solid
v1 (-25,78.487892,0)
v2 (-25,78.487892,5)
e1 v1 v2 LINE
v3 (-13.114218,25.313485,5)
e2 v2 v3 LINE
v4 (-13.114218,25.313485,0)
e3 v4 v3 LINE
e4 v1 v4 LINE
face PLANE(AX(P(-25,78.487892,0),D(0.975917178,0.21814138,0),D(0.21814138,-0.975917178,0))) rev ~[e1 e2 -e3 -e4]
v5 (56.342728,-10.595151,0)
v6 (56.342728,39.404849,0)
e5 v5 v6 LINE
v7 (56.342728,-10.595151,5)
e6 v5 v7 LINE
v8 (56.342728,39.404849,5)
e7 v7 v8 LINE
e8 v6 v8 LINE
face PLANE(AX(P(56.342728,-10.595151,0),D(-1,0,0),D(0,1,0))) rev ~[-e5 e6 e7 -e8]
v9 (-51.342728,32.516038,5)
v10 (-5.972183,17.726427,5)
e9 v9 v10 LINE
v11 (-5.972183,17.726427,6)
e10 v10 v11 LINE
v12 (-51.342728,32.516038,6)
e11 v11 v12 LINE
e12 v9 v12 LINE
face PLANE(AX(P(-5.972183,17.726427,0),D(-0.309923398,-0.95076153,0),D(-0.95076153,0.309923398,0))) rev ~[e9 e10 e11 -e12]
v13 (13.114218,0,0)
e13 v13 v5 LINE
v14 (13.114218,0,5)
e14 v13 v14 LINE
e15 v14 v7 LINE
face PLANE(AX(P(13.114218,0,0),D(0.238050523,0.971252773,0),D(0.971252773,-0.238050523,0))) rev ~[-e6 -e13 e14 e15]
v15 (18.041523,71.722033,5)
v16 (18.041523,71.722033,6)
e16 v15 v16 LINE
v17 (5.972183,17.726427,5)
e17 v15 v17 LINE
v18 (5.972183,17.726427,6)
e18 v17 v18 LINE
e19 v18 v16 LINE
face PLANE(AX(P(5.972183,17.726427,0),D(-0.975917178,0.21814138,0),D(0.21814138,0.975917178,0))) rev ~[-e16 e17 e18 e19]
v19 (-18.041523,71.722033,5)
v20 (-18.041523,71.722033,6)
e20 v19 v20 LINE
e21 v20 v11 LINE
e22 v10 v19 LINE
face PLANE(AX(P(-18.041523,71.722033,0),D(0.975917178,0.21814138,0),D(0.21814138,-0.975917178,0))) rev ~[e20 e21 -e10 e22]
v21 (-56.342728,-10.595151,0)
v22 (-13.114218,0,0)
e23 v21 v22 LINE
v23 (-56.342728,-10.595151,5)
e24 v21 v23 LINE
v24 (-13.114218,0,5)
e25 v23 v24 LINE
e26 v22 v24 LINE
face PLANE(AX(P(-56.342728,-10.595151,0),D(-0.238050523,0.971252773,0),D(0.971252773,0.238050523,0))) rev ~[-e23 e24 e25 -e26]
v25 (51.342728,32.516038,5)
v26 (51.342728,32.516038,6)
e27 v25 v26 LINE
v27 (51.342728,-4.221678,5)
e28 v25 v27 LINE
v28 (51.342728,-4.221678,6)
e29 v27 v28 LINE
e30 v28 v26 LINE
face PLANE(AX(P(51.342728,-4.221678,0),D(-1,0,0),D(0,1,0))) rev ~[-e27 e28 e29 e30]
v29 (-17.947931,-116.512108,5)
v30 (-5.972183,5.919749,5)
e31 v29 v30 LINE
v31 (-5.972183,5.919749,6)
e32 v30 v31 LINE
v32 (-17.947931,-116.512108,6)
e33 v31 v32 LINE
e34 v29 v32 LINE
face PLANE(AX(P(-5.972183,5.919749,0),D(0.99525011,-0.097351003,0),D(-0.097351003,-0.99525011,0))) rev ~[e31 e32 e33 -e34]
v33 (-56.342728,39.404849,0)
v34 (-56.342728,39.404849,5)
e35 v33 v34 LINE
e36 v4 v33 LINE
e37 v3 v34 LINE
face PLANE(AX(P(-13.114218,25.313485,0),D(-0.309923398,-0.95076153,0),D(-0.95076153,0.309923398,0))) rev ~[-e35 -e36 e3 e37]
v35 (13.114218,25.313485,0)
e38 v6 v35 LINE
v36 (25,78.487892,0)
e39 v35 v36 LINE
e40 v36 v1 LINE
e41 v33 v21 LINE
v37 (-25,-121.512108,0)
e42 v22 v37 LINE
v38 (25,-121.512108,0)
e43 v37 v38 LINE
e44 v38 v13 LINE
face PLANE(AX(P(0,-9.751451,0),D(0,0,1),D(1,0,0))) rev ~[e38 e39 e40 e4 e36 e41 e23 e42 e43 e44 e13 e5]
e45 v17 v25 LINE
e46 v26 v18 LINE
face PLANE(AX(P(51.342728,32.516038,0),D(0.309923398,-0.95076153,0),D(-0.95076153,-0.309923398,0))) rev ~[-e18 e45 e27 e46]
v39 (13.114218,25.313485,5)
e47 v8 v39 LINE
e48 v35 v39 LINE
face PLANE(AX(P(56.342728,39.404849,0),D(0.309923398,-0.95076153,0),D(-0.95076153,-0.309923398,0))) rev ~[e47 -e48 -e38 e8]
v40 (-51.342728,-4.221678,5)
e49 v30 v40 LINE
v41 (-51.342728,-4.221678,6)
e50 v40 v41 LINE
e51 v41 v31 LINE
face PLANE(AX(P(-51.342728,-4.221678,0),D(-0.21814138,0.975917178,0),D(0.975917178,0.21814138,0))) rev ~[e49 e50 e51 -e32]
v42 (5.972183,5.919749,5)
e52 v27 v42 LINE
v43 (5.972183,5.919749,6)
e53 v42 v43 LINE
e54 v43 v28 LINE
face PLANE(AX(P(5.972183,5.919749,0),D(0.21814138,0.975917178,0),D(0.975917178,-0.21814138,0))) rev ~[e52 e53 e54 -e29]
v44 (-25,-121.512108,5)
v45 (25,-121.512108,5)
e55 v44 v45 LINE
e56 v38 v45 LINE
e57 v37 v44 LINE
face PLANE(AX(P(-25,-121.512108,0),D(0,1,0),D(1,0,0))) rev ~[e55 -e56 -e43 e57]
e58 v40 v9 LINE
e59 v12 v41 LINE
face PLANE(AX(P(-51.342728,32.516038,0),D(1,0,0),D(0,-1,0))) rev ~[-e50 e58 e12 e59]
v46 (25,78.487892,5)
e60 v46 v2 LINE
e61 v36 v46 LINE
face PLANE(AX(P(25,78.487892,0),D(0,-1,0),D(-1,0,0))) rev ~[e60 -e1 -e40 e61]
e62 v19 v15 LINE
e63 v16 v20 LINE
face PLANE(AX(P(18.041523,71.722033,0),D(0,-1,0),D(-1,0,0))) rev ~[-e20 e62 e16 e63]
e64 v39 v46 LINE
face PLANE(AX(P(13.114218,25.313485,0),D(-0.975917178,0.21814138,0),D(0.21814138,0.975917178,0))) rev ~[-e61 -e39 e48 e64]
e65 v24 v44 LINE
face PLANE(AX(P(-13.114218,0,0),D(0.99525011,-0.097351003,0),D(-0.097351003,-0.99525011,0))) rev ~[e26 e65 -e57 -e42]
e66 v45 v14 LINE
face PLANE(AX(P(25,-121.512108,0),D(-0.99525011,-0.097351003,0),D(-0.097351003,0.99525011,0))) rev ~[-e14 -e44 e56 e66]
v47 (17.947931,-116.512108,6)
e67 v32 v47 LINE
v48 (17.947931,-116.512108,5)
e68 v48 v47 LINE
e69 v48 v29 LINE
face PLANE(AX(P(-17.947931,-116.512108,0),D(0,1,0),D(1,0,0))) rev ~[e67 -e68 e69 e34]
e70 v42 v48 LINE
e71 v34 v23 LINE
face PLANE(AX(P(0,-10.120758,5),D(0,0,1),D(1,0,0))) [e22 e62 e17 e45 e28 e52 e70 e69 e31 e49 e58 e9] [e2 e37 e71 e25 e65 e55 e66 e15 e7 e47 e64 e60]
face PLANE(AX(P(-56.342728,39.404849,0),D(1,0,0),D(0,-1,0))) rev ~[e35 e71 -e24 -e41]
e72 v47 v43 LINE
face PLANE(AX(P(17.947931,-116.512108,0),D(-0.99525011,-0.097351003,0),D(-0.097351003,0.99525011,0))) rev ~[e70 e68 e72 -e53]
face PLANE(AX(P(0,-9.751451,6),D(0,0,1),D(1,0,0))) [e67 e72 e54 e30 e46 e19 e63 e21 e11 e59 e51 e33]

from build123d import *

# Parameters (mm, degrees)
F1_DEPTH = 5
F2_DEPTH = 6


# Not quite as in the source:
# - a feature names something its author has since deleted; it is built from what else it names


with BuildPart() as f1:
    # F0 (on Top) → F1 (new body)
    with BuildSketch(Plane.XY):
        Polygon((25, 78.4878924489), (0, 78.4878924489), (-25, 78.4878924489), (-13.1142183076, 25.3134854138), (-56.342728436, 39.404849359), (-56.342728436, -10.595150641), (-13.1142183076, 0), (-25, -121.5121075511), (0, -121.5121075511), (25, -121.5121075511), (13.1142183076, 0), (56.342728436, -10.595150641), (56.342728436, 39.404849359), (13.1142183076, 25.3134854138), align=None)
        Polygon((-18.0415231461, 71.7220325265), (0, 71.7220325265), (18.0415231461, 71.7220325265), (5.9721833782, 17.7264265097), (51.342728436, 32.5160378311), (51.342728436, -4.2216783711), (5.9721833782, 5.9197491293), (17.9479308986, -116.5121075511), (0, -116.5121075511), (-17.9479308986, -116.5121075511), (-5.9721833782, 5.9197491293), (-51.342728436, -4.2216783711), (-51.342728436, 32.5160378311), (-5.9721833782, 17.7264265097), align=None, mode=Mode.SUBTRACT)
        Polygon((18.0415231461, 71.7220325265), (0, 71.7220325265), (-18.0415231461, 71.7220325265), (-5.9721833782, 17.7264265097), (-51.342728436, 32.5160378311), (-51.342728436, -4.2216783711), (-5.9721833782, 5.9197491293), (-17.9479308986, -116.5121075511), (0, -116.5121075511), (17.9479308986, -116.5121075511), (5.9721833782, 5.9197491293), (51.342728436, -4.2216783711), (51.342728436, 32.5160378311), (5.9721833782, 17.7264265097), align=None)
    extrude(amount=F1_DEPTH)

    # F0 (on Top) → F2 (join)
    with BuildSketch(Plane.XY):
        Polygon((18.0415231461, 71.7220325265), (0, 71.7220325265), (-18.0415231461, 71.7220325265), (-5.9721833782, 17.7264265097), (-51.342728436, 32.5160378311), (-51.342728436, -4.2216783711), (-5.9721833782, 5.9197491293), (-17.9479308986, -116.5121075511), (0, -116.5121075511), (17.9479308986, -116.5121075511), (5.9721833782, 5.9197491293), (51.342728436, -4.2216783711), (51.342728436, 32.5160378311), (5.9721833782, 17.7264265097), align=None)
    extrude(amount=F2_DEPTH)


solid = f1.part
